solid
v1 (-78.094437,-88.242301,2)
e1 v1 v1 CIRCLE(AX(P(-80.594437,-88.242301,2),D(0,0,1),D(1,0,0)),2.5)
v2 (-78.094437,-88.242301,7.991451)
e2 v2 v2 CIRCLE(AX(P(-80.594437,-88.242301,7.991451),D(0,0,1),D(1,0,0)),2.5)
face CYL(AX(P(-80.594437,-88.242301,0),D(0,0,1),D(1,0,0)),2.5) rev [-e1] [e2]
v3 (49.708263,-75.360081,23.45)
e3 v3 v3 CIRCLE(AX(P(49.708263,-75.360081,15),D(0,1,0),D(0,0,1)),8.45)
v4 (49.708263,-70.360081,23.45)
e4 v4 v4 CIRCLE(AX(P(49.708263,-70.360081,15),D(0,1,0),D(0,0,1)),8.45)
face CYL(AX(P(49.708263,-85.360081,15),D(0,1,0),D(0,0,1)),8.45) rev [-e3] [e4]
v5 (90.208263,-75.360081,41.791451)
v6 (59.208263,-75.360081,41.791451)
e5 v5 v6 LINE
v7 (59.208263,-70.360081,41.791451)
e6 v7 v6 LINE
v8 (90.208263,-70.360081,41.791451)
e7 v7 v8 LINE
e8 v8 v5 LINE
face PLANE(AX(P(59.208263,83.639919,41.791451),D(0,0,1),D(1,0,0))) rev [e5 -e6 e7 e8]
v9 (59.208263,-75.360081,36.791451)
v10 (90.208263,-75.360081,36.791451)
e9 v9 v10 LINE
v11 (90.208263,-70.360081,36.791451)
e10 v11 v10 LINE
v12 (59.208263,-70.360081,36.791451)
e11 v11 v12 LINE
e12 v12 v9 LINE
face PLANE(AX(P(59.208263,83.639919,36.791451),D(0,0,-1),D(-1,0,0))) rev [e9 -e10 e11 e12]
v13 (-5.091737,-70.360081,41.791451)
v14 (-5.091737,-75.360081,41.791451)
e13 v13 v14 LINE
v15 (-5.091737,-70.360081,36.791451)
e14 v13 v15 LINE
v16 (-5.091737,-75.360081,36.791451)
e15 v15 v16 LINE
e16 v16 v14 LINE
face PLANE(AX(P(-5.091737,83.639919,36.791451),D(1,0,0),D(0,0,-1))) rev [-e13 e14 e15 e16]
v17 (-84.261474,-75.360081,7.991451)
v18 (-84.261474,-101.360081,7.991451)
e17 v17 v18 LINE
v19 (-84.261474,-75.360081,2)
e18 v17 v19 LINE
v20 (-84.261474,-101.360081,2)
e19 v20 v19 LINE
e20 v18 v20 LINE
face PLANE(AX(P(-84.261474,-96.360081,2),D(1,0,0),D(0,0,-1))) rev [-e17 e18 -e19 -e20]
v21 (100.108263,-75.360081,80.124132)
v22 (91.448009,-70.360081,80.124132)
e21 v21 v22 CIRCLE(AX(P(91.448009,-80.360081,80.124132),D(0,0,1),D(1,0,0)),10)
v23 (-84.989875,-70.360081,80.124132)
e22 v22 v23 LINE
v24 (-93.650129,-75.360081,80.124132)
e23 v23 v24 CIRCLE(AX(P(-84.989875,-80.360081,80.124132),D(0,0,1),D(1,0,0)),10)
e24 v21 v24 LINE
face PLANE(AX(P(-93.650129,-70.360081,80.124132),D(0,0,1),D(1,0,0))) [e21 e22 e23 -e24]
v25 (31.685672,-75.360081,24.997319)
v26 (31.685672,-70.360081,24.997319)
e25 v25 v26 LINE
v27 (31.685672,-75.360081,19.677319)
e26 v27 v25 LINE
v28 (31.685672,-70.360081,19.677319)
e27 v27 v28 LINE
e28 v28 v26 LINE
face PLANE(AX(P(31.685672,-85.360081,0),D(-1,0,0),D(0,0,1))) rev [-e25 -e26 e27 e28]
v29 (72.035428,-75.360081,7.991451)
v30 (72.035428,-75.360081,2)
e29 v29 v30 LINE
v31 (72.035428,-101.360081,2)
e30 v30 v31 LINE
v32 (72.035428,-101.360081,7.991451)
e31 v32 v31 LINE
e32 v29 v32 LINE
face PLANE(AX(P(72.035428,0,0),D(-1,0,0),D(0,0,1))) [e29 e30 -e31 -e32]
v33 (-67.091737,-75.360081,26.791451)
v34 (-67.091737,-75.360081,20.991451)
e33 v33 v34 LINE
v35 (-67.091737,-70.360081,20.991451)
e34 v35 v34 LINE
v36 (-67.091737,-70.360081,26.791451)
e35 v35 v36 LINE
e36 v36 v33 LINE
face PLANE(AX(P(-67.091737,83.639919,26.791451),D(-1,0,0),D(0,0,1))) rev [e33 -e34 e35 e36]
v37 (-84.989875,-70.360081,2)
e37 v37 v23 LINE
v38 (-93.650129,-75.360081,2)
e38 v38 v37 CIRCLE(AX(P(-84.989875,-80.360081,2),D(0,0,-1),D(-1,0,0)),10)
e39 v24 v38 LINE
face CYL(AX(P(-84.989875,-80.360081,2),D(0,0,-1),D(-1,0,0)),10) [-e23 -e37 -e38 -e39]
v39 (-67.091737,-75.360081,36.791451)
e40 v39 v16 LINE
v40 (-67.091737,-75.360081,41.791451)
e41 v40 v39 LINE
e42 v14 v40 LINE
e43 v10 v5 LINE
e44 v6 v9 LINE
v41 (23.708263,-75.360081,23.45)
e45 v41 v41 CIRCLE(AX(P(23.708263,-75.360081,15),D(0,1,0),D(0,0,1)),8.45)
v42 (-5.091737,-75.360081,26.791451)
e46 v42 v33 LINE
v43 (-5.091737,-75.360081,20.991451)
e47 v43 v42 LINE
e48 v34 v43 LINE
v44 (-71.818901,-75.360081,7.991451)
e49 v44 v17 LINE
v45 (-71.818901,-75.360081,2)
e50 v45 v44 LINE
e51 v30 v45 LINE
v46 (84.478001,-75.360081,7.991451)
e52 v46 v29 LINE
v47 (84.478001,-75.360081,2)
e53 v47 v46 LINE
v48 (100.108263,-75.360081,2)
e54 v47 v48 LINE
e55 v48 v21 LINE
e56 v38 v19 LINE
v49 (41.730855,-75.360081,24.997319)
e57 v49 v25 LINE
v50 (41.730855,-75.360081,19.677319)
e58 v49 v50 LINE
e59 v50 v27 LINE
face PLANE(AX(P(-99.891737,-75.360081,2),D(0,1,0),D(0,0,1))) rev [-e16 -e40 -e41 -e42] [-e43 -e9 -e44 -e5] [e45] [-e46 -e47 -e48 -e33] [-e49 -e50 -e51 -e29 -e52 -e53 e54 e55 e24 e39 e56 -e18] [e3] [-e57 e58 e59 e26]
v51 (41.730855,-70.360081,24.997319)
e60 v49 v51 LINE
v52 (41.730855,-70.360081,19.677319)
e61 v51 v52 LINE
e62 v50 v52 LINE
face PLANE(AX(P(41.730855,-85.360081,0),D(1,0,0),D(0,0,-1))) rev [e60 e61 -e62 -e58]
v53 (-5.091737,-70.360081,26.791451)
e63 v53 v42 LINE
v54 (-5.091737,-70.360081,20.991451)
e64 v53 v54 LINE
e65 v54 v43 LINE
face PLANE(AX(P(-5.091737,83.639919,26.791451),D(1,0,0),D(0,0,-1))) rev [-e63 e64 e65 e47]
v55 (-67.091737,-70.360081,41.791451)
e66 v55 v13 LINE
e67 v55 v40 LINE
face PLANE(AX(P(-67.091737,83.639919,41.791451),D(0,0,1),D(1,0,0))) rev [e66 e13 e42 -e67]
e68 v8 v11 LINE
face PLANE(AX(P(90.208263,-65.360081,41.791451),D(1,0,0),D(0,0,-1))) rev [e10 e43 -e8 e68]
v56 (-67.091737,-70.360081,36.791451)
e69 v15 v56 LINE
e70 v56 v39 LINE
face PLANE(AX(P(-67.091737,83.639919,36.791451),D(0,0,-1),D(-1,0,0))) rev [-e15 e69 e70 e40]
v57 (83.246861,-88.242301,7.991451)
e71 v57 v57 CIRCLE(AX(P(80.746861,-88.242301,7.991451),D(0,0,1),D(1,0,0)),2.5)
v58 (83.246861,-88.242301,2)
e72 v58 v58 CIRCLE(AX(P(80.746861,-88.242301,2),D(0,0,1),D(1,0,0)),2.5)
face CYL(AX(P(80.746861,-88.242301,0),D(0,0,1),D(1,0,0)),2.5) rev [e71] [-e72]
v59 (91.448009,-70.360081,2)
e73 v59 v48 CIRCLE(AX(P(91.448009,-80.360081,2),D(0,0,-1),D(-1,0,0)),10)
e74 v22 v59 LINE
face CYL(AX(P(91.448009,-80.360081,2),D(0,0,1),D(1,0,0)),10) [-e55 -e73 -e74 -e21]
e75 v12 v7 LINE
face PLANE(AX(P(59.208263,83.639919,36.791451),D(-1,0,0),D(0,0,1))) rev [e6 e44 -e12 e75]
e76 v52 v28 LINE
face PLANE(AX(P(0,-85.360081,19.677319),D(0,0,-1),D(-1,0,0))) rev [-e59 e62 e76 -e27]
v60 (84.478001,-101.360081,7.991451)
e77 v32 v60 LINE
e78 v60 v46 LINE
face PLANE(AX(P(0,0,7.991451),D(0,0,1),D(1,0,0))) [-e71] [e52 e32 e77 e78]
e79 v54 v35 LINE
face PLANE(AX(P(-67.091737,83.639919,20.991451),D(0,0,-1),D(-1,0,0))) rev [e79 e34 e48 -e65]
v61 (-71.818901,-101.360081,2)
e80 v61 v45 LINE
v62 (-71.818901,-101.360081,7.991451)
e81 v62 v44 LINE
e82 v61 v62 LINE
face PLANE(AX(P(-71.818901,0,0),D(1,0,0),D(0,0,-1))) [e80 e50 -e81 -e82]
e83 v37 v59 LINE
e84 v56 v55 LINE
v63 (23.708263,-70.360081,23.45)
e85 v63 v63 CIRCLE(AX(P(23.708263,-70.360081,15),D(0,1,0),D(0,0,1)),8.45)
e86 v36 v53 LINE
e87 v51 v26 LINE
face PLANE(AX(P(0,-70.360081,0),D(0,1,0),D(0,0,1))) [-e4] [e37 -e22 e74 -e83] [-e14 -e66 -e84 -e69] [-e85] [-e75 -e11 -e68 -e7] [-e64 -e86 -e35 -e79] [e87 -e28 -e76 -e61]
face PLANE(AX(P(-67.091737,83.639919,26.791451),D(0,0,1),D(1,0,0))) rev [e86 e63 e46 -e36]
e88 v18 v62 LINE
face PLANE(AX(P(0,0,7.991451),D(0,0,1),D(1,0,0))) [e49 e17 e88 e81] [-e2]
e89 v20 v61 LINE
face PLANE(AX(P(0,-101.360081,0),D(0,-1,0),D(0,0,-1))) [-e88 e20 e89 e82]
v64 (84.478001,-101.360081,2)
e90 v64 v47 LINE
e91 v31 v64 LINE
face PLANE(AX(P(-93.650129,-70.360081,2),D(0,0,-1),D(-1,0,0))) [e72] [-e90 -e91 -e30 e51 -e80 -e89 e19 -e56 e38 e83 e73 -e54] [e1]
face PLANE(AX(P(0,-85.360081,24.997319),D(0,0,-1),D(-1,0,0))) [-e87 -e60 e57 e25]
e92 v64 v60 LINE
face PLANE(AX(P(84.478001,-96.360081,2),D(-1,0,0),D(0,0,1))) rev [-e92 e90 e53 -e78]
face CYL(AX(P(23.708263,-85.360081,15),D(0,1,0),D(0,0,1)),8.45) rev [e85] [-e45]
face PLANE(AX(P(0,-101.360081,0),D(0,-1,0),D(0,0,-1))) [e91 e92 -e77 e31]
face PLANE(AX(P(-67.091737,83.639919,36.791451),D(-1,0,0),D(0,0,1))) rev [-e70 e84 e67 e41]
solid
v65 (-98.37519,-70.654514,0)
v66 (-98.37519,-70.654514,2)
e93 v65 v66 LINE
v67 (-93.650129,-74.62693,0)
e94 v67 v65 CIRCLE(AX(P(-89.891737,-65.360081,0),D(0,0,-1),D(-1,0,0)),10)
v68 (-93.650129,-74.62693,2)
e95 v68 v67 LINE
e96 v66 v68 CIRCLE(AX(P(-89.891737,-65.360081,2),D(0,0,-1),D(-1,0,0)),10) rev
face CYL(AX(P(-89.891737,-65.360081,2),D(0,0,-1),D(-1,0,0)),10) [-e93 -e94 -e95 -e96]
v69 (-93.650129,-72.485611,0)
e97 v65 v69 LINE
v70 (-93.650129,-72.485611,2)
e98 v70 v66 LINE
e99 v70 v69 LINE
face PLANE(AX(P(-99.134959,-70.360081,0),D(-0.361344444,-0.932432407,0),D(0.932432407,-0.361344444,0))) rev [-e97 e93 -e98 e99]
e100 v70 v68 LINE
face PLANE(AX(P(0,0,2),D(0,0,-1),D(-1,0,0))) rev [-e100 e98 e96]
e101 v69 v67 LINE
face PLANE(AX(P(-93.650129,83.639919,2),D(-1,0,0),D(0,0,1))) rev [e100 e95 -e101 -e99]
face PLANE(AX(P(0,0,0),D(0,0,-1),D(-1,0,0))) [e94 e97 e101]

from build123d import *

# Parameters (mm, degrees)
CROQUIS2_W              = 200
CROQUIS2_H              = 150
CROQUIS2_R              = 2
CROQUIS2_R_2            = 2.5
CROQUIS2_W_2            = 31.297292299
CROQUIS2_H_2            = 43.768728426
CROQUIS2_H_3            = 43.768728427
CROQUIS2_W_3            = 23.573907934
CROQUIS2_H_4            = 45.323962431
SALIENTE_EXTRUIR1_DEPTH = 2
REDONDEO1_R             = 10
BOSS_EXTRUDE1_DEPTH     = 25
SKETCH3_W               = 62.040442094
SKETCH3_H               = 5.530821024
BOSS_EXTRUDE2_DEPTH     = 22
SKETCH8_W               = 62.040442094
SKETCH8_H               = 5.530821024
BOSS_EXTRUDE6_DEPTH     = 13
SKETCH2_W               = 193.758392872
SKETCH2_H               = 78.124132015
SKETCH2_W_2             = 62.040442094
SKETCH2_H_2             = 5.530821024
BOSS_EXTRUDE3_DEPTH     = 5
SKETCH4_W               = 62.040442094
SKETCH4_H               = 5.530821024
BOSS_EXTRUDE4_DEPTH     = 19
SKETCH5_W               = 7.442573222
SKETCH5_H               = 2.991451355
BOSS_EXTRUDE5_DEPTH     = 21
SKETCH6_R               = 2.5
CUT_EXTRUDE1_DEPTH      = 158.961544101
FILLET1_R               = 10
SKETCH13_W              = 62.040442094
SKETCH13_H              = 4.214652984
CUT_EXTRUDE6_DEPTH      = 149.758539633
SKETCH14_R              = 2.5
CUT_EXTRUDE7_DEPTH      = 158.961544101
SKETCH11_W              = 62
SKETCH11_H              = 5.8
SKETCH11_H_2            = 5
SKETCH11_W_2            = 193.758392872
SKETCH11_H_3            = 2
SKETCH11_W_3            = 27.3
CUT_EXTRUDE8_DEPTH      = 205.260962853
SKETCH17_W              = 130.161323944
SKETCH17_H              = 157.545365022
CUT_EXTRUDE9_DEPTH      = 149.758539633
CROQUIS5_W              = 3.7
CROQUIS5_H              = 5
CORTAR_EXTRUIR7_DEPTH   = 10
CROQUIS6_W              = 2.991451355
CROQUIS6_H              = 21
SALIENTE_EXTRUIR2_DEPTH = 5
CROQUIS7_W              = 12.442573222
CROQUIS7_H              = 2.991451355
SALIENTE_EXTRUIR3_DEPTH = 5
CROQUIS8_W              = 12.442573222
CROQUIS8_H              = 26
SALIENTE_EXTRUIR4_DEPTH = 3
CROQUIS9_R              = 2.5
CORTAR_EXTRUIR8_DEPTH   = 16
CROQUIS11_W             = 2.991451355
CROQUIS11_H             = 21
SALIENTE_EXTRUIR5_DEPTH = 5
CROQUIS12_W             = 12.442573222
CROQUIS12_H             = 2.991451355
SALIENTE_EXTRUIR6_DEPTH = 5
CROQUIS13_W             = 12.442573222
CROQUIS13_H             = 26
SALIENTE_EXTRUIR7_DEPTH = 3
CROQUIS14_R             = 2.5
CORTAR_EXTRUIR9_DEPTH   = 15
CROQUIS15_W             = 10.045182272
CROQUIS15_H             = 5.32
CROQUIS15_R             = 8.45
CORTAR_EXTRUIR10_DEPTH  = 15


with BuildPart() as part:
    # Croquis2 → Saliente-Extruir1 (new body)
    with BuildSketch(Plane.XY):
        with Locations((0.108263467, -0.36008145)):
            Rectangle(CROQUIS2_W, CROQUIS2_H)
        with Locations((89.108263467, -66.5)):
            Circle(CROQUIS2_R, mode=Mode.SUBTRACT)
        with Locations((-88.891736533, -66.5)):
            Circle(CROQUIS2_R, mode=Mode.SUBTRACT)
        with Locations(Location((89.108263467, 65.779837101, 0), (0, 0, 180))):
            Circle(CROQUIS2_R, mode=Mode.SUBTRACT)
        with Locations(Location((-88.891736533, 65.779837101, 0), (0, 0, 180))):
            Circle(CROQUIS2_R, mode=Mode.SUBTRACT)
        with Locations((-80.865436179, -59.36008145)):
            Circle(CROQUIS2_R_2, mode=Mode.SUBTRACT)
        with Locations((81.108263467, -59.36008145)):
            Circle(CROQUIS2_R_2, mode=Mode.SUBTRACT)
        with Locations(Location((81.108263467, 58.63991855, 0), (0, 0, 180))):
            Circle(CROQUIS2_R_2, mode=Mode.SUBTRACT)
        with Locations(Location((-80.865436179, 58.63991855, 0), (0, 0, 180))):
            Circle(CROQUIS2_R_2, mode=Mode.SUBTRACT)
        with BuildLine():
            Line((-62.091736533, 70.63991855), (64.108263467, 70.63991855))
            ThreePointArc((64.108263467, 70.63991855), (66.108263467, 68.63991855), (64.108263467, 66.63991855))
            Line((64.108263467, 66.63991855), (-62.091736533, 66.63991855))
            ThreePointArc((-62.091736533, 66.63991855), (-64.091736533, 68.63991855), (-62.091736533, 70.63991855))
        make_face(mode=Mode.SUBTRACT)
        Polygon((-71.391736533, -12.902447307), (-71.391736533, 12.182284408), (-79.241736533, 12.28991855), (-83.891736533, 12.28991855), (-83.891736533, -13.01008145), (-79.241736533, -13.01008145), align=None, mode=Mode.SUBTRACT)
        with BuildLine():
            Line((92.108263467, 45.478381757), (92.108263467, -46.198544657))
            ThreePointArc((92.108263467, -46.198544657), (90.807295546, -47.897576736), (89.108263467, -46.596608814))
            Line((89.108263467, -46.596608814), (89.108263467, 45.876445915))
            ThreePointArc((89.108263467, 45.876445915), (90.807295546, 47.177413836), (92.108263467, 45.478381757))
        make_face(mode=Mode.SUBTRACT)
        Polygon((84.108263467, 12.28991855), (84.108263467, -13.01008145), (79.458263467, -13.01008145), (71.608263467, -13.01008145), (71.608263467, 12.28991855), (79.458263467, 12.28991855), align=None, mode=Mode.SUBTRACT)
        with BuildLine():
            Line((-91.891736533, 45.478381757), (-91.891736533, -46.198544657))
            ThreePointArc((-91.891736533, -46.198544657), (-90.590768612, -47.897576736), (-88.891736533, -46.596608814))
            Line((-88.891736533, -46.596608814), (-88.891736533, 45.876445915))
            ThreePointArc((-88.891736533, 45.876445915), (-90.590768612, 47.177413836), (-91.891736533, 45.478381757))
        make_face(mode=Mode.SUBTRACT)
        with Locations((-30.011405388, 36.299005811)):
            Rectangle(CROQUIS2_W_2, CROQUIS2_H_2, mode=Mode.SUBTRACT)
        with BuildLine():
            Line((-62.091736533, -71.36008145), (64.108263467, -71.36008145))
            ThreePointArc((64.108263467, -71.36008145), (66.108263467, -69.36008145), (64.108263467, -67.36008145))
            Line((64.108263467, -67.36008145), (-62.091736533, -67.36008145))
            ThreePointArc((-62.091736533, -67.36008145), (-64.091736533, -69.36008145), (-62.091736533, -71.36008145))
        make_face(mode=Mode.SUBTRACT)
        with Locations((-30.011405388, -26.799059535)):
            Rectangle(CROQUIS2_W_2, CROQUIS2_H_3, mode=Mode.SUBTRACT)
        with Locations((12.982877294, -0.693345879)):
            Rectangle(CROQUIS2_W_3, CROQUIS2_H_4, mode=Mode.SUBTRACT)
    extrude(amount=SALIENTE_EXTRUIR1_DEPTH)

    # Redondeo1
    redondeo1_edges = [part.edges().sort_by_distance(p)[0] for p in [
        (100.108263467, -75.36008145, 1),
        (-99.891736533, -75.36008145, 1),
        (-99.891736533, 74.63991855, 1),
        (100.108263467, 74.63991855, 1),
    ]]
    fillet(redondeo1_edges, radius=REDONDEO1_R)

    # Sketch1 → Boss-Extrude1 (add)
    with BuildSketch(Plane.XY.offset(2)):
        Polygon((-67.071845217, 64.63991855), (-67.071845217, 60.63991855), (-8.841198185, 60.63991855), (-8.841198185, 3.63991855), (-67.071845217, 3.63991855), (-67.071845217, -0.36008145), (-8.841198185, -0.36008145), (-8.841198185, -53.36008145), (-67.071845217, -53.36008145), (-67.071845217, -57.574734434), (-5.031403123, -57.574734434), (-5.031403123, -40.931443482), (46.608263467, -40.931443482), (46.608263467, -36.931443482), (-5.031403123, -36.931443482), (-5.031403123, 30.068556518), (46.608263467, 30.068556518), (46.608263467, 34.068556518), (-5.031403123, 34.068556518), (-5.031403123, 64.63991855), align=None)
    extrude(amount=BOSS_EXTRUDE1_DEPTH)

    # Sketch3 → Boss-Extrude2 (add)
    with BuildSketch(Plane.XZ.offset(57.574734434)):
        with Locations((-36.05162417, 24.234589488)):
            Rectangle(SKETCH3_W, SKETCH3_H)
    extrude(amount=BOSS_EXTRUDE2_DEPTH)

    # Sketch8 → Boss-Extrude6 (add)
    with BuildSketch(Plane(origin=(0, 64.63991855, 0), x_dir=(1, 0, 0), z_dir=(0, 1, 0))):
        with Locations((-36.05162417, -24.234589488)):
            Rectangle(SKETCH8_W, SKETCH8_H)
    extrude(amount=BOSS_EXTRUDE6_DEPTH)

    # Sketch2 → Boss-Extrude3 (add)
    with BuildSketch(Plane.XZ.offset(75.36008145)):
        with Locations((3.229067031, 41.062066008)):
            Rectangle(SKETCH2_W, SKETCH2_H)
        with Locations((-36.05162417, 24.234589488)):
            Rectangle(SKETCH2_W_2, SKETCH2_H_2, mode=Mode.SUBTRACT)
    extrude(amount=-BOSS_EXTRUDE3_DEPTH)

    # Sketch4 → Boss-Extrude4 (add)
    with BuildSketch(Plane(origin=(0, 64.63991855, 0), x_dir=(1, 0, 0), z_dir=(0, 1, 0))):
        with Locations((-36.05162417, -24.234589488)):
            Rectangle(SKETCH4_W, SKETCH4_H)
    extrude(amount=BOSS_EXTRUDE4_DEPTH)

    # Sketch5 → Boss-Extrude5 (add)
    with BuildSketch(Plane.XZ.offset(75.36008145)):
        with Locations((-80.540187187, 3.495725678)):
            Rectangle(SKETCH5_W, SKETCH5_H)
        with Locations((80.756714122, 3.495725678)):
            Rectangle(SKETCH5_W, SKETCH5_H)
    extrude(amount=BOSS_EXTRUDE5_DEPTH)

    # Sketch6 → Cut-Extrude1 (cut, through all)
    with BuildSketch(Plane.XY.offset(4.991451355)):
        with Locations((-80.996023003, -59.284349751)):
            Circle(SKETCH6_R)
        with Locations(Location((85.770332707, -52.138660273, 0), (0, 0, 180))):
            Circle(SKETCH6_R)
        Polygon((-106.504987954, 85.891433433), (-93.566486568, 85.891433433), (-93.566486568, -70.36008145), (-93.650129405, -70.36008145), (-93.650129405, -72.48561093), (-99.134958643, -70.36008145), (-106.504987954, -70.36008145), align=None)
    extrude(amount=-CUT_EXTRUDE1_DEPTH, mode=Mode.SUBTRACT)

    # Fillet1
    # the kernel refuses this fillet: 10 mm, written as the material it takes off along each edge
    with BuildSketch(Plane(origin=(-93.650129405, -70.36008145, 101.77476711), x_dir=(1, 0, 0), z_dir=(0, 0, -1))) as fillet1_piece_1_section:
        with BuildLine():
            CenterArc((8.660254038, 10), FILLET1_R, 210, 60)
            Line((0, 5), (0, 0))
            Line((0, 0), (8.660254038, 0))
        make_face()
    fillet1_piece_1 = extrude(amount=123.425402204, mode=Mode.PRIVATE)
    fillet1_piece_1 = split(fillet1_piece_1, bisect_by=Plane(origin=(-88.735327831, -71.066428463, 2), z_dir=(0, 0, 1)), keep=Keep.TOP, mode=Mode.PRIVATE)
    add(fillet1_piece_1, mode=Mode.SUBTRACT)
    with BuildSketch(Plane(origin=(-93.650129405, -70.36008145, 101.77476711), x_dir=(1, 0, 0), z_dir=(0, 0, -1))) as fillet1_piece_2_section:
        with BuildLine():
            CenterArc((8.660254038, 10), FILLET1_R, 210, 60)
            Line((0, 5), (0, 0))
            Line((0, 0), (8.660254038, 0))
        make_face()
    fillet1_piece_2 = extrude(amount=123.425402204, mode=Mode.PRIVATE)
    fillet1_piece_2 = split(fillet1_piece_2, bisect_by=Plane(origin=(-93.566486568, -71.430970133, 1), z_dir=(-1, 0, 0)), keep=Keep.TOP, mode=Mode.PRIVATE)
    fillet1_piece_2 = split(fillet1_piece_2, bisect_by=Plane(origin=(-93.969016237, -72.362033087, 1), z_dir=(0.36134444351220746, 0.9324324067420936, 0)), keep=Keep.TOP, mode=Mode.PRIVATE)
    add(fillet1_piece_2, mode=Mode.SUBTRACT)
    with BuildSketch(Plane(origin=(100.108263467, -70.36008145, 2), x_dir=(-1, 0, 0), z_dir=(0, 0, 1))) as fillet1_piece_3:
        with BuildLine():
            CenterArc((8.660254038, 10), FILLET1_R, 210, 60)
            Line((0, 5), (0, 0))
            Line((0, 0), (8.660254038, 0))
        make_face()
    extrude(amount=99.77476711, mode=Mode.SUBTRACT)

    # Sketch13 → Cut-Extrude6 (cut, through all)
    with BuildSketch(Plane.XY.offset(27)):
        with Locations((-36.05162417, -77.467407942)):
            Rectangle(SKETCH13_W, SKETCH13_H)
    extrude(amount=-CUT_EXTRUDE6_DEPTH, mode=Mode.SUBTRACT)

    # Sketch14 → Cut-Extrude7 (cut, through all)
    with BuildSketch(Plane.XY.offset(4.991451355)):
        with Locations((-80.594436734, -88.242300615)):
            Circle(SKETCH14_R)
        with Locations((80.746860659, -88.242300615)):
            Circle(SKETCH14_R)
    extrude(amount=-CUT_EXTRUDE7_DEPTH, mode=Mode.SUBTRACT)

    # Sketch11 → Cut-Extrude8 (cut, through all)
    with BuildSketch(Plane.XZ.offset(75.36008145)):
        with Locations((-36.091736533, 23.891451355)):
            Rectangle(SKETCH11_W, SKETCH11_H)
        with Locations((-36.091736533, 39.291451355)):
            Rectangle(SKETCH11_W, SKETCH11_H_2)
        with Locations((3.229067031, 1)):
            Rectangle(SKETCH11_W_2, SKETCH11_H_3)
        with Locations((72.858263467, 39.291451355)):
            Rectangle(SKETCH11_W_3, SKETCH11_H_2)
    extrude(amount=-CUT_EXTRUDE8_DEPTH, mode=Mode.SUBTRACT)


with BuildPart() as cut_extrude8_piece_1:
    # of the separate pieces the step leaves, piece 1, a body of its own (cut_extrude8_pieces)
    add(part.part.solids().sort_by_distance((-84.261473798, -75.36008145, 4.991451355))[0])

    # Sketch17 → Cut-Extrude9 (cut, through all)
    with BuildSketch(Plane.XY.offset(27)):
        with Locations((-14.253473071, 8.412601061)):
            Rectangle(SKETCH17_W, SKETCH17_H)
    extrude(amount=-CUT_EXTRUDE9_DEPTH, mode=Mode.SUBTRACT)

    # Croquis5 → Cortar-Extruir7 (cut)
    with BuildSketch(Plane.XZ.offset(75.36008145)):
        with Locations((88.358263467, 39.291451355)):
            Rectangle(CROQUIS5_W, CROQUIS5_H)
    extrude(amount=-CORTAR_EXTRUIR7_DEPTH, mode=Mode.SUBTRACT)

    # Croquis6 → Saliente-Extruir2 (add)
    with BuildSketch(Plane(origin=(-76.818900576, 0, 0), x_dir=(0, 0, -1), z_dir=(1, 0, 0))):
        with Locations((-3.495725678, -85.86008145)):
            Rectangle(CROQUIS6_W, CROQUIS6_H)
    extrude(amount=SALIENTE_EXTRUIR2_DEPTH)

    # Croquis7 → Saliente-Extruir3 (add)
    with BuildSketch(Plane.XZ.offset(96.36008145)):
        with Locations((-78.040187187, 3.495725678)):
            Rectangle(CROQUIS7_W, CROQUIS7_H)
    extrude(amount=SALIENTE_EXTRUIR3_DEPTH)

    # Croquis8 → Saliente-Extruir4 (add)
    with BuildSketch(Plane.XY.offset(4.991451355)):
        with Locations((-78.040187187, -88.36008145)):
            Rectangle(CROQUIS8_W, CROQUIS8_H)
    extrude(amount=SALIENTE_EXTRUIR4_DEPTH)

    # Croquis9 → Cortar-Extruir8 (cut)
    with BuildSketch(Plane(origin=(0, 0, 2), x_dir=(-1, 0, 0), z_dir=(0, 0, -1))):
        with Locations(Location((80.594436734, -88.242300615, 0), (0, 0, 180))):
            Circle(CROQUIS9_R)
    extrude(amount=-CORTAR_EXTRUIR8_DEPTH, mode=Mode.SUBTRACT)

    # Croquis11 → Saliente-Extruir5 (add)
    with BuildSketch(Plane.ZY.offset(-77.035427511)):
        with Locations((3.495725678, -85.86008145)):
            Rectangle(CROQUIS11_W, CROQUIS11_H)
    extrude(amount=SALIENTE_EXTRUIR5_DEPTH)

    # Croquis12 → Saliente-Extruir6 (add)
    with BuildSketch(Plane.XZ.offset(96.36008145)):
        with Locations((78.256714122, 3.495725678)):
            Rectangle(CROQUIS12_W, CROQUIS12_H)
    extrude(amount=SALIENTE_EXTRUIR6_DEPTH)

    # Croquis13 → Saliente-Extruir7 (add)
    with BuildSketch(Plane.XY.offset(4.991451355)):
        with Locations((78.256714122, -88.36008145)):
            Rectangle(CROQUIS13_W, CROQUIS13_H)
    extrude(amount=SALIENTE_EXTRUIR7_DEPTH)

    # Croquis14 → Cortar-Extruir9 (cut)
    with BuildSketch(Plane(origin=(0, 0, 2), x_dir=(-1, 0, 0), z_dir=(0, 0, -1))):
        with Locations(Location((-80.746860659, -88.242300615, 0), (0, 0, 180))):
            Circle(CROQUIS14_R)
    extrude(amount=-CORTAR_EXTRUIR9_DEPTH, mode=Mode.SUBTRACT)

    # Croquis15 → Cortar-Extruir10 (cut)
    with BuildSketch(Plane(origin=(0, -70.36008145, 0), x_dir=(1, 0, 0), z_dir=(0, 1, 0))):
        with Locations((36.708263467, -22.337318572)):
            Rectangle(CROQUIS15_W, CROQUIS15_H)
        with Locations(Location((49.708263467, -15, 0), (0, 0, 270))):
            Circle(CROQUIS15_R)
        with Locations(Location((23.708263467, -15, 0), (0, 0, 270))):
            Circle(CROQUIS15_R)
    extrude(amount=-CORTAR_EXTRUIR10_DEPTH, mode=Mode.SUBTRACT)


with BuildPart() as cut_extrude8_piece_2:
    # of the separate pieces the step leaves, piece 2, a body of its own (cut_extrude8_pieces)
    add(part.part.solids().sort_by_distance((-93.650129405, -74.626930052, 0))[0])


solid = Compound([cut_extrude8_piece_1.part, cut_extrude8_piece_2.part])
